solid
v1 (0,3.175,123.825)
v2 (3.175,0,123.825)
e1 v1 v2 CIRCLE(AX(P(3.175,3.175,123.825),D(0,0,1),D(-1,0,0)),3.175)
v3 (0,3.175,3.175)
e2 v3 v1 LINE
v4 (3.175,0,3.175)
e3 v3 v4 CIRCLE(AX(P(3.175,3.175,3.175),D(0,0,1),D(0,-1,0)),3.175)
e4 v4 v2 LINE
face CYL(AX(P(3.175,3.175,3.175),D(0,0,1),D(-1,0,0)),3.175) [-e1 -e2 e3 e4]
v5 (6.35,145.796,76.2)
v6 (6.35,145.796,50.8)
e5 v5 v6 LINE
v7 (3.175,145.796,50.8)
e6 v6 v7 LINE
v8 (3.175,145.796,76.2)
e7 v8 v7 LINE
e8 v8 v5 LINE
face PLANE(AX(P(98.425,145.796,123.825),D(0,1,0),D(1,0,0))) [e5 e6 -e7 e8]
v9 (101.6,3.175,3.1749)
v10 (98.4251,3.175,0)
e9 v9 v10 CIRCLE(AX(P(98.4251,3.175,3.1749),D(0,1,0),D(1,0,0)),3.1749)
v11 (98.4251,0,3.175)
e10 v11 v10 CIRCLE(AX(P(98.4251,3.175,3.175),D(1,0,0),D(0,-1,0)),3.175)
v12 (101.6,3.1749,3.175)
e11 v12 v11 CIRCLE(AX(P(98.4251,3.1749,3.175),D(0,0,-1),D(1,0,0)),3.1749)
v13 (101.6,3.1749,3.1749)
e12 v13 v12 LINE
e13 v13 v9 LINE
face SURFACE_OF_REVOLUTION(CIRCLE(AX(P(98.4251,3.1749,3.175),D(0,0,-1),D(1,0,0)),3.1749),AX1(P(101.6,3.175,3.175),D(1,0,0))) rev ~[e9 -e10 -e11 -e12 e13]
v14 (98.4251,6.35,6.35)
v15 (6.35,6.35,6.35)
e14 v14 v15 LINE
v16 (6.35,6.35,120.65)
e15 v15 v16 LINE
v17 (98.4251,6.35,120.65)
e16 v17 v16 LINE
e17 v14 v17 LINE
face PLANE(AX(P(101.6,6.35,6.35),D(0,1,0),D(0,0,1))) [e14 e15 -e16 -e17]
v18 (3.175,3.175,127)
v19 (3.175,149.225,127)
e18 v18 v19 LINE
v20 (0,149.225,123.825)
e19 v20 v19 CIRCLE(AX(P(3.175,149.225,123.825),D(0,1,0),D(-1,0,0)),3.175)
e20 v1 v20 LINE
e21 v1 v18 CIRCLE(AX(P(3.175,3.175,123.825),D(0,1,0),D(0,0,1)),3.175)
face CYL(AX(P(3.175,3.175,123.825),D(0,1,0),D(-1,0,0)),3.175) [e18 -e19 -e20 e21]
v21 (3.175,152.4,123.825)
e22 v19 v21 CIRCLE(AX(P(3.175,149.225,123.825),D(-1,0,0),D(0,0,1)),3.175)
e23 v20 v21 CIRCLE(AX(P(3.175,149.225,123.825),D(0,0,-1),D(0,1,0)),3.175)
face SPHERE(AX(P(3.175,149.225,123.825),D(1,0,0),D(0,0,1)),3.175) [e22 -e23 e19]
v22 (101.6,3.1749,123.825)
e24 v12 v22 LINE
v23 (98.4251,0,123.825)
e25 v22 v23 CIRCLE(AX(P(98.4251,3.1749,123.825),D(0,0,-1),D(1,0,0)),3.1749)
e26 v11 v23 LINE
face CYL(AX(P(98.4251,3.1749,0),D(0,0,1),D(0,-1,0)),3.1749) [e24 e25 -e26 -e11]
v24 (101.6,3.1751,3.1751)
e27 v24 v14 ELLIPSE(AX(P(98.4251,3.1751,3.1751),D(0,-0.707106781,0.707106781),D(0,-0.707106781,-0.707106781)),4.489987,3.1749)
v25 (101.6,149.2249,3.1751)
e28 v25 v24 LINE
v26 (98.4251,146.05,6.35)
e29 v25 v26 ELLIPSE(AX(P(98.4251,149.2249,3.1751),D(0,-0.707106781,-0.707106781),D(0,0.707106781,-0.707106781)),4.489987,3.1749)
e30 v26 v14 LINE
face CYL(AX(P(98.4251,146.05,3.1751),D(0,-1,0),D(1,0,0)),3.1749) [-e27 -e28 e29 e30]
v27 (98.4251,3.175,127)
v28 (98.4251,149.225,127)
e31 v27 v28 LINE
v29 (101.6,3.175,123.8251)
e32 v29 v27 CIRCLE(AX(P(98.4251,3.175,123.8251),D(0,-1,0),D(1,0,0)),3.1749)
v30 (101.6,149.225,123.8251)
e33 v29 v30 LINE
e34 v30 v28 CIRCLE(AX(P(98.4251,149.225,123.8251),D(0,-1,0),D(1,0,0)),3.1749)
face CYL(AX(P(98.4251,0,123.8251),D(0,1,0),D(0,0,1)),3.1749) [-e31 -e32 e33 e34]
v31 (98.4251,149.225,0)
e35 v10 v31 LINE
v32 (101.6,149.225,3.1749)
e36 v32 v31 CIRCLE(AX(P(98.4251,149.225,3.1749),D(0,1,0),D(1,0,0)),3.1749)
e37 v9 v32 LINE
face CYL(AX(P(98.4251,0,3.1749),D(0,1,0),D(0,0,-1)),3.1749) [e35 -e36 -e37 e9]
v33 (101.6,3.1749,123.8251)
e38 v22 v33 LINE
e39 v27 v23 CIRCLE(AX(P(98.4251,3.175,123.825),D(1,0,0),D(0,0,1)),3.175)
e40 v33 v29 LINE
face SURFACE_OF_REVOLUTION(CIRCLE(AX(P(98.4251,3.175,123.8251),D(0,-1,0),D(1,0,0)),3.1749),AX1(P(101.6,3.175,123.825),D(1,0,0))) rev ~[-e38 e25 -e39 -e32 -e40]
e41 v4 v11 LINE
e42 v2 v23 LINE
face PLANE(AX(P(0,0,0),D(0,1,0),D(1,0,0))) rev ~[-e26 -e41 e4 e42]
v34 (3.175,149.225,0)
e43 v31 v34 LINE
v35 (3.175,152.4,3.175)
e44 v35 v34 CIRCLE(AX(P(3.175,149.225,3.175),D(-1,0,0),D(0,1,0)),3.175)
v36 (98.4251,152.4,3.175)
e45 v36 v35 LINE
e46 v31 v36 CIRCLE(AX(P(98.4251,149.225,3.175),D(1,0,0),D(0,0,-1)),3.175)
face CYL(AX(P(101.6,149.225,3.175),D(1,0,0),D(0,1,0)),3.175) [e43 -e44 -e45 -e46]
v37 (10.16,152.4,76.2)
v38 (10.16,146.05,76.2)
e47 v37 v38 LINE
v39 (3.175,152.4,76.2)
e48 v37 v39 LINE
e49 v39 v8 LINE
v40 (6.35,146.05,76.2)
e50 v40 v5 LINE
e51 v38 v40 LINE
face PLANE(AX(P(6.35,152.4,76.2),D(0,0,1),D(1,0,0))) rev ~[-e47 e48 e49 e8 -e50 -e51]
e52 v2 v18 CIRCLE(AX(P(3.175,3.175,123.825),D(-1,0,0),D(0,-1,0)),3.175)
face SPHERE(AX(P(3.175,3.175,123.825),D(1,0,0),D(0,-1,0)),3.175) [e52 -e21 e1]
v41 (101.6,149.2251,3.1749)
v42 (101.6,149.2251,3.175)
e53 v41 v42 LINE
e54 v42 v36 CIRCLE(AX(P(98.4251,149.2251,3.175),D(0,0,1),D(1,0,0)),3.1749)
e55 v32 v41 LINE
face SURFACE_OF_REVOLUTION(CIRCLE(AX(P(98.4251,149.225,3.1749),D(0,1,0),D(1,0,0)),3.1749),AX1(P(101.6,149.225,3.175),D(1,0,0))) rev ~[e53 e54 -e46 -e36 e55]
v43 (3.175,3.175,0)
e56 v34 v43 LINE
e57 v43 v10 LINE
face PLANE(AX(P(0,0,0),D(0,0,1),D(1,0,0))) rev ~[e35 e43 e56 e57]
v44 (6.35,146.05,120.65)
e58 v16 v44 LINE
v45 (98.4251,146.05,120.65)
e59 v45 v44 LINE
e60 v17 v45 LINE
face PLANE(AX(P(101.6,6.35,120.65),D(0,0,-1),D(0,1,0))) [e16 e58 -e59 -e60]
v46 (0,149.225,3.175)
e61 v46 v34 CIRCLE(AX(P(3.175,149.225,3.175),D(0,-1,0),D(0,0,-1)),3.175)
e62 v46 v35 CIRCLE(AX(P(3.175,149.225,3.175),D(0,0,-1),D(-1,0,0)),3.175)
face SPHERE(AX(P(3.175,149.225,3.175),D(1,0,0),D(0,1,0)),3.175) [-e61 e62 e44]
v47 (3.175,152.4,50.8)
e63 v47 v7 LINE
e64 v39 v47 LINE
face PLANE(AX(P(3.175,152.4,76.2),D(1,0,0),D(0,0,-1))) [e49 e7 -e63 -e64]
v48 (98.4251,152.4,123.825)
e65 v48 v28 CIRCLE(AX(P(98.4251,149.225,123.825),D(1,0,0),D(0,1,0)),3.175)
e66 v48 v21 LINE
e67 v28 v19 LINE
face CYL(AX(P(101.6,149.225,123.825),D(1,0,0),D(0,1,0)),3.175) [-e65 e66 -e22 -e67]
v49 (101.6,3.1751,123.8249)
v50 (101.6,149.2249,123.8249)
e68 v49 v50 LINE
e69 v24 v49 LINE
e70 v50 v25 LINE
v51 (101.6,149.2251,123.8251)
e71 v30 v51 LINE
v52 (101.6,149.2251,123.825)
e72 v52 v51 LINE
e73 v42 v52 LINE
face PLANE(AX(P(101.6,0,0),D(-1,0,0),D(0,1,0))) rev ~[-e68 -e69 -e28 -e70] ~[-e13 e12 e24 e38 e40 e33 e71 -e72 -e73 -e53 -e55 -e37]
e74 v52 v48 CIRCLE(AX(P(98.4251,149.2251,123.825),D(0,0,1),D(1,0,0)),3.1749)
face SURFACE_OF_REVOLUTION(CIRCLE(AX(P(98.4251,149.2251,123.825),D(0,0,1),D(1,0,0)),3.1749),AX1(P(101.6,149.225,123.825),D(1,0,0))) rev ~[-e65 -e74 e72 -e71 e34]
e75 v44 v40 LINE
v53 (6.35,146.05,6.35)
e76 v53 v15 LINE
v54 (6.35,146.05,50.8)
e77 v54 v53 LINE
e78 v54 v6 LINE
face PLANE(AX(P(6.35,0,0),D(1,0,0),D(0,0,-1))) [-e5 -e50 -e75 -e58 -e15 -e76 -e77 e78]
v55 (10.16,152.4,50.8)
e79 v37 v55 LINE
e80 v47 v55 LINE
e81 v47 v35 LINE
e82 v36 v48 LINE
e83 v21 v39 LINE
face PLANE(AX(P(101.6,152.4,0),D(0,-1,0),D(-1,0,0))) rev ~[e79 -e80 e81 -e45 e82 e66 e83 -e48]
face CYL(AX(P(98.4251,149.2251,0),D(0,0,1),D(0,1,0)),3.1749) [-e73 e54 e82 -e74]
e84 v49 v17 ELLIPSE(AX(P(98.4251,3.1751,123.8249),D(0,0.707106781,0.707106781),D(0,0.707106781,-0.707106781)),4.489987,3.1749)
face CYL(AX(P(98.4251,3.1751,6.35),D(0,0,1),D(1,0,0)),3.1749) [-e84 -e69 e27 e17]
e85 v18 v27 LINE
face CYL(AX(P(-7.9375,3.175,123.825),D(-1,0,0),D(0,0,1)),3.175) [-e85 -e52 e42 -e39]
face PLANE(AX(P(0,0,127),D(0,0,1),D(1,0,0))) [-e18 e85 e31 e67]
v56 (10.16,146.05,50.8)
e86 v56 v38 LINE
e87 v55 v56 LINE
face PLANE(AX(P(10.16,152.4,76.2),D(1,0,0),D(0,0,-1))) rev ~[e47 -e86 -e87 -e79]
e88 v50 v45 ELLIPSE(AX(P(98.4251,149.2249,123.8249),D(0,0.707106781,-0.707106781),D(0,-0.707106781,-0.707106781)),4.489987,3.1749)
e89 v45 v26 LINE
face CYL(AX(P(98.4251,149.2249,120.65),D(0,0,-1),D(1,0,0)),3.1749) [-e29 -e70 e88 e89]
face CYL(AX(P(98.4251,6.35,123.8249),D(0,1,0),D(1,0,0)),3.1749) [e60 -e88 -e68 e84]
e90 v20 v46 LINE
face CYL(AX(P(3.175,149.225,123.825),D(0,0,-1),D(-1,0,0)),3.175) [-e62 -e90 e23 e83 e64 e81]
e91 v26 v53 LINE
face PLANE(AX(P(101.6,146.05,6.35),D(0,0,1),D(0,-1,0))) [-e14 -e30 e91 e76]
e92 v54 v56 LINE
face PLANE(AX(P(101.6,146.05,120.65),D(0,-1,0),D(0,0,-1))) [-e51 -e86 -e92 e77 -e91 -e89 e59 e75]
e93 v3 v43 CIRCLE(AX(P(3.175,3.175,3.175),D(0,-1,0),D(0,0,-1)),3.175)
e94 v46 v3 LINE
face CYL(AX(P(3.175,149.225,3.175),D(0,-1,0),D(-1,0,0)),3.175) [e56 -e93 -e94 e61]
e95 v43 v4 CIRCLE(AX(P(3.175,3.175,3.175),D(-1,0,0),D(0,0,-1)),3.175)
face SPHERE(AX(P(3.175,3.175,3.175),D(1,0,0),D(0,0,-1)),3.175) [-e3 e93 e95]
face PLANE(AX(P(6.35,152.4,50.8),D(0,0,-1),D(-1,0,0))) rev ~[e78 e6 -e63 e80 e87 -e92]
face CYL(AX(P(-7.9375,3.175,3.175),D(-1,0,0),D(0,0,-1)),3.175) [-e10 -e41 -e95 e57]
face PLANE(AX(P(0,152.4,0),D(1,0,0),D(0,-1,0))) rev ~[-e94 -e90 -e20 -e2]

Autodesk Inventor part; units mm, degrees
ref_plane "YZ Plane" through (0, 0, 0) normal (1, 0, 0) x (0, 1, 0)
ref_plane "XZ Plane" through (0, 0, 0) normal (0, 1, 0) x (-1, 0, 0)
ref_plane "XY Plane" through (0, 0, 0) normal (0, 0, 1) x (1, 0, 0)
sketch "Sketch1" plane through (0, 0, 0) normal (0, 0, 1) x (1, 0, 0)
  line L0 (0, 0) -> (101.6, 0)
  line L1 (101.6, 0) -> (101.6, 152.4)
  line L2 (101.6, 152.4) -> (0, 152.4)
  line L3 (0, 152.4) -> (0, 0)
  dimension "d0" = 101.6
  dimension "d1" = 152.4
sketch "Sketch2" plane through (0, 0, 0) normal (0, 0, 1) x (1, 0, 0)
  point P0 (0, 0)
sketch "Sketch3" plane through (0, 0, 0) normal (0, 0, 1) x (1, 0, 0)
  point P0 (0, 0)
extrude "Extrusion1" add sketch "Sketch1" along normal blind 127
sketch "Sketch4" plane through (101.6, 0, 0) normal (1, 0, 0) x (0, 0, -1)
  line L0 (0, 0) -> (-127, 0) projected
  line L1 (0, 0) -> (-6.35, 0)
  line L2 (-6.35, 0) -> (-6.35, 6.35)
  line L3 (-6.35, 6.35) -> (0, 6.35)
  line L4 (0, 6.35) -> (0, 0)
  line L5 (-6.35, 6.35) -> (-120.65, 6.35)
  line L6 (-120.65, 6.35) -> (-120.65, 146.05)
  line L7 (-120.65, 146.05) -> (-6.35, 146.05)
  line L8 (-6.35, 146.05) -> (-6.35, 6.35)
  dimension "d4" = 6.35
  dimension "d5" = 6.35
  dimension "d6" = 114.3
  dimension "d7" = 139.7
extrude "Extrusion2" cut sketch "Sketch4" against normal blind 95.25 contours L5 L6 L7 L8
fillet "Fillet1" radius 3.175 8 edges at (101.6, 146.05, 63.5) (101.6, 152.4, 63.5) (101.6, 76.2, 127) (101.6, 76.2, 120.65) (101.6, 76.2, 6.35) (101.6, 76.2, 0) (101.6, 6.35, 63.5) (101.6, 0, 63.5)
fillet "Fillet2" radius 3.175 8 edges at (100.6701, 151.4701, 126.0701) (49.2126, 152.4, 127) (100.6701, 151.4701, 0.9299) (49.2126, 152.4, 0) (100.6701, 0.9299, 126.0701) (49.2126, 0, 127) (100.6701, 0.9299, 0.9299) (49.2126, 0, 0)
fillet "Fillet3" radius 3.175 8 edges at (0, 0.9299, 0.9299) (0, 0, 63.5) (0, 0.9299, 126.0701) (0, 76.2, 127) (0, 151.4701, 126.0701) (0, 152.4, 63.5) (0, 151.4701, 0.9299) (0, 76.2, 0)
sketch "Sketch5" plane through (6.35, 6.35, 6.35) normal (0, 0, 1) x (1, 0, 0)
  line L0 (92.075, 0) -> (0, 0) projected
  arc A0 (95.25, -3.175) -> (92.075, 0) centre (92.075, -3.175) ccw projected
  line L1 (92.075, 0) -> (89.535, 0)
  line L2 (92.075, 0) -> (94.615, 0) construction
  line L3 (91.2996, 0) -> (88.936, -0.9299)
  point P0 (-6.35, -6.35)
sketch "Sketch6" plane through (6.35, 6.35, 6.35) normal (0, 0, 1) x (1, 0, 0)
  point P0 (-6.35, -6.35)
sketch "Sketch7" plane through (98.425, 152.4, 123.825) normal (0, 1, 0) x (1, 0, 0)
  line L0 (-95.25, 120.65) -> (0, 120.65) projected
  line L1 (-95.25, 120.65) -> (-95.25, 73.025)
  line L2 (0, 0) -> (-95.25, 0) projected
  arc A0 (-98.425, 0) -> (-95.25, -3.175) centre (-95.25, 0) ccw projected
  line L3 (-92.075, 3.175) -> (-92.075, 117.475) projected
  line L4 (-95.25, 0) -> (-98.425, 0) projected
  line L5 (-95.25, 0) -> (-95.25, 47.625)
  line L6 (-95.25, 0) -> (-95.25, 120.65) projected
  line L7 (-95.25, 73.025) -> (-95.25, 47.625)
  line L8 (-95.25, 47.625) -> (-91.44, 47.625)
  line L9 (-91.44, 47.625) -> (-91.44, 73.025)
  line L10 (-91.44, 73.025) -> (-95.25, 73.025)
  point P0 (-98.425, 123.825)
  point P1 (-92.075, 73.025)
  point P2 (-92.075, 47.625)
  dimension "d17" = 47.625
  dimension "d20" = 47.625
  dimension "d21" = 3.81
sketch "Sketch8" plane through (98.425, 152.4, 123.825) normal (0, 1, 0) x (1, 0, 0)
  point P0 (-98.425, 123.825)
extrude "Extrusion3" cut sketch "Sketch7" against normal blind 6.604 contours L8 L6 L10 L3
sketch "Sketch9" plane through (98.425, 152.4, 123.825) normal (0, 1, 0) x (1, 0, 0)
  line L0 (-95.25, 73.025) -> (-92.075, 73.025) projected
  line L1 (-92.075, 73.025) -> (-92.075, 47.625) projected
  line L2 (-92.075, 73.025) -> (-92.075, 47.625)
  line L3 (-92.075, 47.625) -> (-88.265, 47.625)
  line L4 (-88.265, 47.625) -> (-88.265, 73.025)
  line L5 (-88.265, 73.025) -> (-92.075, 73.025)
  point P0 (-98.425, 123.825)
  dimension "d24" = 3.81
extrude "Extrusion4" cut sketch "Sketch9" against normal blind 7.62
properties part number "box"
